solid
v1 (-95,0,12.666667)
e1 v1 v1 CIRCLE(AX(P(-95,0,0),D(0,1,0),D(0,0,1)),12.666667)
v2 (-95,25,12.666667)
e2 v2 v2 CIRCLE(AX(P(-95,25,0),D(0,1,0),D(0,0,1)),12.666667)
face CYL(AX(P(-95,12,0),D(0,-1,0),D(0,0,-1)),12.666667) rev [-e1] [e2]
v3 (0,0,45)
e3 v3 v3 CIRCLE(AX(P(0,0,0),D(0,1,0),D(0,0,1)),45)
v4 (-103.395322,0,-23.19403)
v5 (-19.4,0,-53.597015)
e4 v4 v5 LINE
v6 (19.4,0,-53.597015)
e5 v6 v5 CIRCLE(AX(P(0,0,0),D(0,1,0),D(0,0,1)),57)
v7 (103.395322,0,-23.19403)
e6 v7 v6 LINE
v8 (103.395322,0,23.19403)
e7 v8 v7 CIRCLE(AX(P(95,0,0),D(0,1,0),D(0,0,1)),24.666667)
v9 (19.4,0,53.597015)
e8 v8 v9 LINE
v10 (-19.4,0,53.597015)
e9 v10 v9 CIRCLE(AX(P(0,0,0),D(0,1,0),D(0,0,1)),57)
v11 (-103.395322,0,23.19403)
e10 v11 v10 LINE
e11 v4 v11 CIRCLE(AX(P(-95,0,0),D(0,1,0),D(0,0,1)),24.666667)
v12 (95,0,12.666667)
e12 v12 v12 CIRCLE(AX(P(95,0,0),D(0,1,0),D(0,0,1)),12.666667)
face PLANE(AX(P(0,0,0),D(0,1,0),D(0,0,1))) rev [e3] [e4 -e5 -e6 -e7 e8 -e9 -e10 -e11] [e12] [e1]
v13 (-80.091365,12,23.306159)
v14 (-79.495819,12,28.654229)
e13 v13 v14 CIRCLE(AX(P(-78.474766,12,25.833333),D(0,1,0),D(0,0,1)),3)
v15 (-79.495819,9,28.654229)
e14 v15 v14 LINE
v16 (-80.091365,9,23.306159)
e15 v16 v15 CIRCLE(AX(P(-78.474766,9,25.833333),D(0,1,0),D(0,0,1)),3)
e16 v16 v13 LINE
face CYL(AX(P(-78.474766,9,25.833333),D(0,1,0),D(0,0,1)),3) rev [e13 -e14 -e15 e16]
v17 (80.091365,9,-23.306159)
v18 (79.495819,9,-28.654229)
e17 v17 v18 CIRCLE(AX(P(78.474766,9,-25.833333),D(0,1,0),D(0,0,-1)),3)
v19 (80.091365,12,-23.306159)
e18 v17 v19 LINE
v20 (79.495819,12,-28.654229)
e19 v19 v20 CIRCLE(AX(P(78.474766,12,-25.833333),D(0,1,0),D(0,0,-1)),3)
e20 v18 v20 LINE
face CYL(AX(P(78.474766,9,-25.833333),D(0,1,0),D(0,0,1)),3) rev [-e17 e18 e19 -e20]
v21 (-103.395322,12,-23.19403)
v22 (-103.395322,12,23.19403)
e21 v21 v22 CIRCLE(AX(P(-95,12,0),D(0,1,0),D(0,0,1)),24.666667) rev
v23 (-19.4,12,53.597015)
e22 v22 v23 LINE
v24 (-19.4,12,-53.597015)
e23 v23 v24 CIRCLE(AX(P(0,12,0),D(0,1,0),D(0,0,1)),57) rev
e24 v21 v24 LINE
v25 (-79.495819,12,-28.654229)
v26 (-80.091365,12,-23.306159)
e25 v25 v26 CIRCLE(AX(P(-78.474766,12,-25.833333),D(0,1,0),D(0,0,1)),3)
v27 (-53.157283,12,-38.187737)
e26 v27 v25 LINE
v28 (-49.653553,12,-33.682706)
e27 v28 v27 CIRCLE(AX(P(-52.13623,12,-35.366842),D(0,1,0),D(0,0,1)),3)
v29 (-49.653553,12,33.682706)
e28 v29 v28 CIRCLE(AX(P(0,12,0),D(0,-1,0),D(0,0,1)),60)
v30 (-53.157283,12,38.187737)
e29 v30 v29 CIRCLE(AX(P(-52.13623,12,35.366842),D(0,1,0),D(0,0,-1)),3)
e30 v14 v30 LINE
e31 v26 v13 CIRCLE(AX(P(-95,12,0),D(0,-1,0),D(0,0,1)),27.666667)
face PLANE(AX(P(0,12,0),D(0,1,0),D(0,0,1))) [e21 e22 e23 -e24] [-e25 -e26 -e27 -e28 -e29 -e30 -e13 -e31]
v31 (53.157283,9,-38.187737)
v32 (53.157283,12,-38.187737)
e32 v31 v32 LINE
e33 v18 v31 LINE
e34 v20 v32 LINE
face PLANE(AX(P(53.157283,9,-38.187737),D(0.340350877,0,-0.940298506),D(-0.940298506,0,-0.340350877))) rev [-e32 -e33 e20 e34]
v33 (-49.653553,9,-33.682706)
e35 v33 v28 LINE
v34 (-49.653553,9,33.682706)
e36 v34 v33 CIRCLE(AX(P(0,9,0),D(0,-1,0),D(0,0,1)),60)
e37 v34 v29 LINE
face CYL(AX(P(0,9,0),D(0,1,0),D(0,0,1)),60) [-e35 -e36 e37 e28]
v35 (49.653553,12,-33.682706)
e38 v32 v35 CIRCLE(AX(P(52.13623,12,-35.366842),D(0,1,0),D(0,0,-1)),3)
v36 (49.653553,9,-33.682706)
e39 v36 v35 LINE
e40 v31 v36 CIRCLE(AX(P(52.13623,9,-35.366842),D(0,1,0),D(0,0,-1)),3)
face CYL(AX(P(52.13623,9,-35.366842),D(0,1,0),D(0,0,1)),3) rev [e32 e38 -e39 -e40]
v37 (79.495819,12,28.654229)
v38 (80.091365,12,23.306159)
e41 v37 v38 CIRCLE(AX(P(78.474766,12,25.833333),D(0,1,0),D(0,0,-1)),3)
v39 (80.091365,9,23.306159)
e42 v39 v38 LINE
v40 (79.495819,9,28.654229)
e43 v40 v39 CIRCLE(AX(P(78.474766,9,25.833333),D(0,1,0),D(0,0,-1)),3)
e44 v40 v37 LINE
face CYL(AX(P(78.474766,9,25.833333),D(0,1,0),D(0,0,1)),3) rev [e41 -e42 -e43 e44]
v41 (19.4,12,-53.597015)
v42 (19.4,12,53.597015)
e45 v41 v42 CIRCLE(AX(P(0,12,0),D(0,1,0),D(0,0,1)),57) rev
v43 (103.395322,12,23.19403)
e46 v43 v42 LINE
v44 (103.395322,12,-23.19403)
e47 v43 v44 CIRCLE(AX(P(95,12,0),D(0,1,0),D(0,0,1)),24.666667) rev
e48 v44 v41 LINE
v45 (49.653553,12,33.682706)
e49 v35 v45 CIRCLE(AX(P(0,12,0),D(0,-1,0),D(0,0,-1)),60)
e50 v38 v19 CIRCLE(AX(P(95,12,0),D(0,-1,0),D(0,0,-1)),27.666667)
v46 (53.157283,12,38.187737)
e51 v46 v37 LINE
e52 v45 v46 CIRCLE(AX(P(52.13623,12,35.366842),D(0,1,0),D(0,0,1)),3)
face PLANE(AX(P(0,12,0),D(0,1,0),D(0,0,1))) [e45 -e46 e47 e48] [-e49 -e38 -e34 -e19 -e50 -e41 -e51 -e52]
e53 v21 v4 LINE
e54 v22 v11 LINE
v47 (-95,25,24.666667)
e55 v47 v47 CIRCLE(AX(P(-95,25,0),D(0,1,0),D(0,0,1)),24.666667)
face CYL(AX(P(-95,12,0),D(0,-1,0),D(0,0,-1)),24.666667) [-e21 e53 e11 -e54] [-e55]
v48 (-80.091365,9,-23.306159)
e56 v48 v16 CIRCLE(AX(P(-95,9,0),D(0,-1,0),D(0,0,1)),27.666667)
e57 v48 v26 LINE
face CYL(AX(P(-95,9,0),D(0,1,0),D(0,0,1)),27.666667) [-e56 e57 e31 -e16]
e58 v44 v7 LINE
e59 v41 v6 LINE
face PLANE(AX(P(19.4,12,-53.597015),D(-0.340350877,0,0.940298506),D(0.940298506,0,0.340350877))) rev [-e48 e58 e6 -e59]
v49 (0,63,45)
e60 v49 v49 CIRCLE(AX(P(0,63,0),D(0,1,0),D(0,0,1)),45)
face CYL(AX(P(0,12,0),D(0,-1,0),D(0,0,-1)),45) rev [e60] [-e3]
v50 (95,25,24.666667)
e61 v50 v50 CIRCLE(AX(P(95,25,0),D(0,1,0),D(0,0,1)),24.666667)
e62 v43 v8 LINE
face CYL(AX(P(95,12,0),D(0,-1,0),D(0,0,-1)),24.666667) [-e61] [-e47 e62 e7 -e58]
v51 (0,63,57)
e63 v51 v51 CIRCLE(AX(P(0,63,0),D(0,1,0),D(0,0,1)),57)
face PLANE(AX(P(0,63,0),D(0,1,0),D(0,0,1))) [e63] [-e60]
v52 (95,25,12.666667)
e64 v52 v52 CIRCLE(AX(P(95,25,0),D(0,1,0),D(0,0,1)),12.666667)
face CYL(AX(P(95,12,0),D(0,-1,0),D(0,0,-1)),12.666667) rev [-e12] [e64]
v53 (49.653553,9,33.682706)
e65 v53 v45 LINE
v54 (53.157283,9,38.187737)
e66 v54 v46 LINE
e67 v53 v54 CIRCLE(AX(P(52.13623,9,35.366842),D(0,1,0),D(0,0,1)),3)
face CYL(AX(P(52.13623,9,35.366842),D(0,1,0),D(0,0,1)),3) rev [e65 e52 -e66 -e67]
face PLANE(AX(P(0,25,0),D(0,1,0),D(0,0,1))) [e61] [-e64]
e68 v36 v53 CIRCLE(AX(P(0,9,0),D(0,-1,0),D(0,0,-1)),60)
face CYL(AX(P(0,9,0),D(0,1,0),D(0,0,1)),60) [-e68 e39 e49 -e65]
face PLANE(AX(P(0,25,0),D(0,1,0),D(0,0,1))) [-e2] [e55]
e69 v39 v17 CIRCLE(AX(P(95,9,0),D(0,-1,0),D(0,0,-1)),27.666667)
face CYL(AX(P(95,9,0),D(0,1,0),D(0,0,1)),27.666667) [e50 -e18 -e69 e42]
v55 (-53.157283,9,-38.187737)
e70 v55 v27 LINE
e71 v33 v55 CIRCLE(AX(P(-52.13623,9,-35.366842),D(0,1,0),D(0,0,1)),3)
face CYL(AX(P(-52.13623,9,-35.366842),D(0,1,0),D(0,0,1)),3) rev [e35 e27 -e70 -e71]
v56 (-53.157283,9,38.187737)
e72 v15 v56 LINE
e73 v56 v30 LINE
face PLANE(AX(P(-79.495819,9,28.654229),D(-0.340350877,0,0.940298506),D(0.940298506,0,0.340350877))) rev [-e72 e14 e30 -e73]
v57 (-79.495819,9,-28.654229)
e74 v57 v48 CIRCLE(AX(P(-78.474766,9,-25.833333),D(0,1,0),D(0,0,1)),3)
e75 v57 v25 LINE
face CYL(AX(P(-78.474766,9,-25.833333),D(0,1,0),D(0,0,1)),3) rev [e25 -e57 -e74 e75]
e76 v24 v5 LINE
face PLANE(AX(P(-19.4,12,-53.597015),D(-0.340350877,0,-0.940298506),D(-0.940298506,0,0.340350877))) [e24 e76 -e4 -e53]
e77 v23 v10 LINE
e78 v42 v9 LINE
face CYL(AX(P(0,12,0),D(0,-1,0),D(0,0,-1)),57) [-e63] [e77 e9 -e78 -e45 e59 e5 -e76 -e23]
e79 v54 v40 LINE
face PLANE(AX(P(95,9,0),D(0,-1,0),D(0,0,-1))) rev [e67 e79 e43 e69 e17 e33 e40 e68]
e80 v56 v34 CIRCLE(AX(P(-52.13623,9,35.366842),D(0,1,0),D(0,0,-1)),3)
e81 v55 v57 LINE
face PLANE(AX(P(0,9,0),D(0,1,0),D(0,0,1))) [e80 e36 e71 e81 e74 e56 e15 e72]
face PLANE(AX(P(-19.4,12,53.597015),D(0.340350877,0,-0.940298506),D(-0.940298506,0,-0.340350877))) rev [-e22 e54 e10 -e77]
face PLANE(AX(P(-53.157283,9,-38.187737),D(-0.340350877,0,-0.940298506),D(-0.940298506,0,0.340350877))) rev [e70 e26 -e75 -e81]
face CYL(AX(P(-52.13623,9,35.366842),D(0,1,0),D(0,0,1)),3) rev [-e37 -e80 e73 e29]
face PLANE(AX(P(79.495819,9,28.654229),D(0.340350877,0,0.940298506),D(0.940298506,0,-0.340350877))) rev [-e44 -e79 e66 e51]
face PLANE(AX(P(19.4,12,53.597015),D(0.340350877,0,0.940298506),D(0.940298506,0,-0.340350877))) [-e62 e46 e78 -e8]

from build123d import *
from build123d.topology import SkipClean

# Parameters (mm, degrees)
SKETCH3_R                 = 12.666666667
SKETCH3_R_2               = 45
BOSS_EXTRUDE1_DEPTH       = 12
BOSS_EXTRUDE2_START       = 12
BOSS_EXTRUDE2_OUTLINE_R   = 24.666666667
BOSS_EXTRUDE2_OUTLINE_R_2 = 12.666666667
BOSS_EXTRUDE2_DEPTH       = 13
BOSS_EXTRUDE3_START       = 12
BOSS_EXTRUDE3_DEPTH       = 51
CUT_EXTRUDE1_DEPTH        = 3


# Read off the part's stored shape, not the designer's step: Boss-Extrude2
with BuildPart() as part:
    # Sketch3 → Boss-Extrude1 (new body)
    with BuildSketch(Plane(origin=(0, 0, 0), x_dir=(1, 0, 0), z_dir=(0, 1, 0))):
        with BuildLine():
            ThreePointArc((-103.395321637, 23.194029815), (-119.666666667, 0), (-103.395321637, -23.194029815))
            Line((-103.395321637, -23.194029815), (-19.4, -53.597014842))
            ThreePointArc((-19.4, -53.597014842), (0, -57), (19.4, -53.597014842))
            Line((19.4, -53.597014842), (103.395321637, -23.194029815))
            ThreePointArc((103.395321637, -23.194029815), (119.666666667, 0), (103.395321637, 23.194029815))
            Line((103.395321637, 23.194029815), (19.4, 53.597014842))
            ThreePointArc((19.4, 53.597014842), (0, 57), (-19.4, 53.597014842))
            Line((-19.4, 53.597014842), (-103.395321637, 23.194029815))
        make_face()
        with Locations(Location((-95, 0, 0), (0, 0, 270))):
            Circle(SKETCH3_R, mode=Mode.SUBTRACT)
        with Locations(Location((0, 0, 0), (0, 0, 270))):
            Circle(SKETCH3_R_2, mode=Mode.SUBTRACT)
        with Locations(Location((95, 0, 0), (0, 0, 270))):
            Circle(SKETCH3_R, mode=Mode.SUBTRACT)
    extrude(amount=BOSS_EXTRUDE1_DEPTH)

    # Boss-Extrude2 outline → Boss-Extrude2 (add)
    # profile 1 of 2: a face of its own
    with BuildSketch(Plane(origin=(0, 0, 0), x_dir=(1, 0, 0), z_dir=(0, 1, 0)).offset(BOSS_EXTRUDE2_START)):
        with Locations((-95, 0)):
            Circle(BOSS_EXTRUDE2_OUTLINE_R)
        with Locations((-95, 0)):
            Circle(BOSS_EXTRUDE2_OUTLINE_R_2, mode=Mode.SUBTRACT)
    # profile 2 of 2: a face of its own
    with BuildSketch(Plane(origin=(0, 0, 0), x_dir=(1, 0, 0), z_dir=(0, 1, 0)).offset(BOSS_EXTRUDE2_START)):
        with Locations((95, 0)):
            Circle(BOSS_EXTRUDE2_OUTLINE_R)
        with Locations((95, 0)):
            Circle(BOSS_EXTRUDE2_OUTLINE_R_2, mode=Mode.SUBTRACT)
    extrude(amount=BOSS_EXTRUDE2_DEPTH)

    # Sketch3<7> → Boss-Extrude3 (add)
    with SkipClean():  # the faces are left unmerged after this step: merging them gives an invalid solid
        with BuildSketch(Plane(origin=(0, 0, 0), x_dir=(1, 0, 0), z_dir=(0, 1, 0)).offset(BOSS_EXTRUDE3_START)):
            with BuildLine():
                ThreePointArc((-19.4, 53.597014842), (-46.662618872, 32.735302045), (-57, 0))
                Line((-57, 0), (-45, 0))
                ThreePointArc((-45, 0), (0, 45), (45, 0))
                Line((45, 0), (57, 0))
                ThreePointArc((57, 0), (46.662618872, 32.735302045), (19.4, 53.597014842))
                ThreePointArc((19.4, 53.597014842), (0, 57), (-19.4, 53.597014842))
            make_face()
            with BuildLine():
                Line((-45, 0), (-57, 0))
                ThreePointArc((-57, 0), (-46.662618872, -32.735302045), (-19.4, -53.597014842))
                ThreePointArc((-19.4, -53.597014842), (0, -57), (19.4, -53.597014842))
                ThreePointArc((19.4, -53.597014842), (46.662618872, -32.735302045), (57, 0))
                Line((57, 0), (45, 0))
                ThreePointArc((45, 0), (0, -45), (-45, 0))
            make_face()
        extrude(amount=BOSS_EXTRUDE3_DEPTH)

    # Sketch7 → Cut-Extrude1 (cut)
    with SkipClean():  # the faces are left unmerged after this step: merging them gives an invalid solid
        with BuildSketch(Plane(origin=(0, 12, 0), x_dir=(1, 0, 0), z_dir=(0, 1, 0))):
            with BuildLine():
                Line((79.495818927, -28.654228549), (53.157283033, -38.187737044))
                ThreePointArc((53.157283033, -38.187737044), (49.768127235, -37.208603561), (49.653552763, -33.682706216))
                ThreePointArc((49.653552763, -33.682706216), (60, 0), (49.653552763, 33.682706216))
                ThreePointArc((49.653552763, 33.682706216), (49.768127235, 37.208603561), (53.157283033, 38.187737044))
                Line((53.157283033, 38.187737044), (79.495818927, 28.654228549))
                ThreePointArc((79.495818927, 28.654228549), (81.456336863, 26.165352539), (80.091365245, 23.306159147))
                ThreePointArc((80.091365245, 23.306159147), (67.333333333, 0), (80.091365245, -23.306159147))
                ThreePointArc((80.091365245, -23.306159147), (81.456336863, -26.165352539), (79.495818927, -28.654228549))
            make_face()
            with BuildLine():
                Line((-53.157283033, 38.187737044), (-79.495818927, 28.654228549))
                ThreePointArc((-79.495818927, 28.654228549), (-81.456336863, 26.165352539), (-80.091365245, 23.306159147))
                ThreePointArc((-80.091365245, 23.306159147), (-67.333333333, 0), (-80.091365245, -23.306159147))
                ThreePointArc((-80.091365245, -23.306159147), (-81.456336863, -26.165352539), (-79.495818927, -28.654228549))
                Line((-79.495818927, -28.654228549), (-53.157283033, -38.187737044))
                ThreePointArc((-53.157283033, -38.187737044), (-49.768127235, -37.208603561), (-49.653552763, -33.682706216))
                ThreePointArc((-49.653552763, -33.682706216), (-60, 0), (-49.653552763, 33.682706216))
                ThreePointArc((-49.653552763, 33.682706216), (-49.768127235, 37.208603561), (-53.157283033, 38.187737044))
            make_face()
        extrude(amount=-CUT_EXTRUDE1_DEPTH, mode=Mode.SUBTRACT)


solid = part.part
